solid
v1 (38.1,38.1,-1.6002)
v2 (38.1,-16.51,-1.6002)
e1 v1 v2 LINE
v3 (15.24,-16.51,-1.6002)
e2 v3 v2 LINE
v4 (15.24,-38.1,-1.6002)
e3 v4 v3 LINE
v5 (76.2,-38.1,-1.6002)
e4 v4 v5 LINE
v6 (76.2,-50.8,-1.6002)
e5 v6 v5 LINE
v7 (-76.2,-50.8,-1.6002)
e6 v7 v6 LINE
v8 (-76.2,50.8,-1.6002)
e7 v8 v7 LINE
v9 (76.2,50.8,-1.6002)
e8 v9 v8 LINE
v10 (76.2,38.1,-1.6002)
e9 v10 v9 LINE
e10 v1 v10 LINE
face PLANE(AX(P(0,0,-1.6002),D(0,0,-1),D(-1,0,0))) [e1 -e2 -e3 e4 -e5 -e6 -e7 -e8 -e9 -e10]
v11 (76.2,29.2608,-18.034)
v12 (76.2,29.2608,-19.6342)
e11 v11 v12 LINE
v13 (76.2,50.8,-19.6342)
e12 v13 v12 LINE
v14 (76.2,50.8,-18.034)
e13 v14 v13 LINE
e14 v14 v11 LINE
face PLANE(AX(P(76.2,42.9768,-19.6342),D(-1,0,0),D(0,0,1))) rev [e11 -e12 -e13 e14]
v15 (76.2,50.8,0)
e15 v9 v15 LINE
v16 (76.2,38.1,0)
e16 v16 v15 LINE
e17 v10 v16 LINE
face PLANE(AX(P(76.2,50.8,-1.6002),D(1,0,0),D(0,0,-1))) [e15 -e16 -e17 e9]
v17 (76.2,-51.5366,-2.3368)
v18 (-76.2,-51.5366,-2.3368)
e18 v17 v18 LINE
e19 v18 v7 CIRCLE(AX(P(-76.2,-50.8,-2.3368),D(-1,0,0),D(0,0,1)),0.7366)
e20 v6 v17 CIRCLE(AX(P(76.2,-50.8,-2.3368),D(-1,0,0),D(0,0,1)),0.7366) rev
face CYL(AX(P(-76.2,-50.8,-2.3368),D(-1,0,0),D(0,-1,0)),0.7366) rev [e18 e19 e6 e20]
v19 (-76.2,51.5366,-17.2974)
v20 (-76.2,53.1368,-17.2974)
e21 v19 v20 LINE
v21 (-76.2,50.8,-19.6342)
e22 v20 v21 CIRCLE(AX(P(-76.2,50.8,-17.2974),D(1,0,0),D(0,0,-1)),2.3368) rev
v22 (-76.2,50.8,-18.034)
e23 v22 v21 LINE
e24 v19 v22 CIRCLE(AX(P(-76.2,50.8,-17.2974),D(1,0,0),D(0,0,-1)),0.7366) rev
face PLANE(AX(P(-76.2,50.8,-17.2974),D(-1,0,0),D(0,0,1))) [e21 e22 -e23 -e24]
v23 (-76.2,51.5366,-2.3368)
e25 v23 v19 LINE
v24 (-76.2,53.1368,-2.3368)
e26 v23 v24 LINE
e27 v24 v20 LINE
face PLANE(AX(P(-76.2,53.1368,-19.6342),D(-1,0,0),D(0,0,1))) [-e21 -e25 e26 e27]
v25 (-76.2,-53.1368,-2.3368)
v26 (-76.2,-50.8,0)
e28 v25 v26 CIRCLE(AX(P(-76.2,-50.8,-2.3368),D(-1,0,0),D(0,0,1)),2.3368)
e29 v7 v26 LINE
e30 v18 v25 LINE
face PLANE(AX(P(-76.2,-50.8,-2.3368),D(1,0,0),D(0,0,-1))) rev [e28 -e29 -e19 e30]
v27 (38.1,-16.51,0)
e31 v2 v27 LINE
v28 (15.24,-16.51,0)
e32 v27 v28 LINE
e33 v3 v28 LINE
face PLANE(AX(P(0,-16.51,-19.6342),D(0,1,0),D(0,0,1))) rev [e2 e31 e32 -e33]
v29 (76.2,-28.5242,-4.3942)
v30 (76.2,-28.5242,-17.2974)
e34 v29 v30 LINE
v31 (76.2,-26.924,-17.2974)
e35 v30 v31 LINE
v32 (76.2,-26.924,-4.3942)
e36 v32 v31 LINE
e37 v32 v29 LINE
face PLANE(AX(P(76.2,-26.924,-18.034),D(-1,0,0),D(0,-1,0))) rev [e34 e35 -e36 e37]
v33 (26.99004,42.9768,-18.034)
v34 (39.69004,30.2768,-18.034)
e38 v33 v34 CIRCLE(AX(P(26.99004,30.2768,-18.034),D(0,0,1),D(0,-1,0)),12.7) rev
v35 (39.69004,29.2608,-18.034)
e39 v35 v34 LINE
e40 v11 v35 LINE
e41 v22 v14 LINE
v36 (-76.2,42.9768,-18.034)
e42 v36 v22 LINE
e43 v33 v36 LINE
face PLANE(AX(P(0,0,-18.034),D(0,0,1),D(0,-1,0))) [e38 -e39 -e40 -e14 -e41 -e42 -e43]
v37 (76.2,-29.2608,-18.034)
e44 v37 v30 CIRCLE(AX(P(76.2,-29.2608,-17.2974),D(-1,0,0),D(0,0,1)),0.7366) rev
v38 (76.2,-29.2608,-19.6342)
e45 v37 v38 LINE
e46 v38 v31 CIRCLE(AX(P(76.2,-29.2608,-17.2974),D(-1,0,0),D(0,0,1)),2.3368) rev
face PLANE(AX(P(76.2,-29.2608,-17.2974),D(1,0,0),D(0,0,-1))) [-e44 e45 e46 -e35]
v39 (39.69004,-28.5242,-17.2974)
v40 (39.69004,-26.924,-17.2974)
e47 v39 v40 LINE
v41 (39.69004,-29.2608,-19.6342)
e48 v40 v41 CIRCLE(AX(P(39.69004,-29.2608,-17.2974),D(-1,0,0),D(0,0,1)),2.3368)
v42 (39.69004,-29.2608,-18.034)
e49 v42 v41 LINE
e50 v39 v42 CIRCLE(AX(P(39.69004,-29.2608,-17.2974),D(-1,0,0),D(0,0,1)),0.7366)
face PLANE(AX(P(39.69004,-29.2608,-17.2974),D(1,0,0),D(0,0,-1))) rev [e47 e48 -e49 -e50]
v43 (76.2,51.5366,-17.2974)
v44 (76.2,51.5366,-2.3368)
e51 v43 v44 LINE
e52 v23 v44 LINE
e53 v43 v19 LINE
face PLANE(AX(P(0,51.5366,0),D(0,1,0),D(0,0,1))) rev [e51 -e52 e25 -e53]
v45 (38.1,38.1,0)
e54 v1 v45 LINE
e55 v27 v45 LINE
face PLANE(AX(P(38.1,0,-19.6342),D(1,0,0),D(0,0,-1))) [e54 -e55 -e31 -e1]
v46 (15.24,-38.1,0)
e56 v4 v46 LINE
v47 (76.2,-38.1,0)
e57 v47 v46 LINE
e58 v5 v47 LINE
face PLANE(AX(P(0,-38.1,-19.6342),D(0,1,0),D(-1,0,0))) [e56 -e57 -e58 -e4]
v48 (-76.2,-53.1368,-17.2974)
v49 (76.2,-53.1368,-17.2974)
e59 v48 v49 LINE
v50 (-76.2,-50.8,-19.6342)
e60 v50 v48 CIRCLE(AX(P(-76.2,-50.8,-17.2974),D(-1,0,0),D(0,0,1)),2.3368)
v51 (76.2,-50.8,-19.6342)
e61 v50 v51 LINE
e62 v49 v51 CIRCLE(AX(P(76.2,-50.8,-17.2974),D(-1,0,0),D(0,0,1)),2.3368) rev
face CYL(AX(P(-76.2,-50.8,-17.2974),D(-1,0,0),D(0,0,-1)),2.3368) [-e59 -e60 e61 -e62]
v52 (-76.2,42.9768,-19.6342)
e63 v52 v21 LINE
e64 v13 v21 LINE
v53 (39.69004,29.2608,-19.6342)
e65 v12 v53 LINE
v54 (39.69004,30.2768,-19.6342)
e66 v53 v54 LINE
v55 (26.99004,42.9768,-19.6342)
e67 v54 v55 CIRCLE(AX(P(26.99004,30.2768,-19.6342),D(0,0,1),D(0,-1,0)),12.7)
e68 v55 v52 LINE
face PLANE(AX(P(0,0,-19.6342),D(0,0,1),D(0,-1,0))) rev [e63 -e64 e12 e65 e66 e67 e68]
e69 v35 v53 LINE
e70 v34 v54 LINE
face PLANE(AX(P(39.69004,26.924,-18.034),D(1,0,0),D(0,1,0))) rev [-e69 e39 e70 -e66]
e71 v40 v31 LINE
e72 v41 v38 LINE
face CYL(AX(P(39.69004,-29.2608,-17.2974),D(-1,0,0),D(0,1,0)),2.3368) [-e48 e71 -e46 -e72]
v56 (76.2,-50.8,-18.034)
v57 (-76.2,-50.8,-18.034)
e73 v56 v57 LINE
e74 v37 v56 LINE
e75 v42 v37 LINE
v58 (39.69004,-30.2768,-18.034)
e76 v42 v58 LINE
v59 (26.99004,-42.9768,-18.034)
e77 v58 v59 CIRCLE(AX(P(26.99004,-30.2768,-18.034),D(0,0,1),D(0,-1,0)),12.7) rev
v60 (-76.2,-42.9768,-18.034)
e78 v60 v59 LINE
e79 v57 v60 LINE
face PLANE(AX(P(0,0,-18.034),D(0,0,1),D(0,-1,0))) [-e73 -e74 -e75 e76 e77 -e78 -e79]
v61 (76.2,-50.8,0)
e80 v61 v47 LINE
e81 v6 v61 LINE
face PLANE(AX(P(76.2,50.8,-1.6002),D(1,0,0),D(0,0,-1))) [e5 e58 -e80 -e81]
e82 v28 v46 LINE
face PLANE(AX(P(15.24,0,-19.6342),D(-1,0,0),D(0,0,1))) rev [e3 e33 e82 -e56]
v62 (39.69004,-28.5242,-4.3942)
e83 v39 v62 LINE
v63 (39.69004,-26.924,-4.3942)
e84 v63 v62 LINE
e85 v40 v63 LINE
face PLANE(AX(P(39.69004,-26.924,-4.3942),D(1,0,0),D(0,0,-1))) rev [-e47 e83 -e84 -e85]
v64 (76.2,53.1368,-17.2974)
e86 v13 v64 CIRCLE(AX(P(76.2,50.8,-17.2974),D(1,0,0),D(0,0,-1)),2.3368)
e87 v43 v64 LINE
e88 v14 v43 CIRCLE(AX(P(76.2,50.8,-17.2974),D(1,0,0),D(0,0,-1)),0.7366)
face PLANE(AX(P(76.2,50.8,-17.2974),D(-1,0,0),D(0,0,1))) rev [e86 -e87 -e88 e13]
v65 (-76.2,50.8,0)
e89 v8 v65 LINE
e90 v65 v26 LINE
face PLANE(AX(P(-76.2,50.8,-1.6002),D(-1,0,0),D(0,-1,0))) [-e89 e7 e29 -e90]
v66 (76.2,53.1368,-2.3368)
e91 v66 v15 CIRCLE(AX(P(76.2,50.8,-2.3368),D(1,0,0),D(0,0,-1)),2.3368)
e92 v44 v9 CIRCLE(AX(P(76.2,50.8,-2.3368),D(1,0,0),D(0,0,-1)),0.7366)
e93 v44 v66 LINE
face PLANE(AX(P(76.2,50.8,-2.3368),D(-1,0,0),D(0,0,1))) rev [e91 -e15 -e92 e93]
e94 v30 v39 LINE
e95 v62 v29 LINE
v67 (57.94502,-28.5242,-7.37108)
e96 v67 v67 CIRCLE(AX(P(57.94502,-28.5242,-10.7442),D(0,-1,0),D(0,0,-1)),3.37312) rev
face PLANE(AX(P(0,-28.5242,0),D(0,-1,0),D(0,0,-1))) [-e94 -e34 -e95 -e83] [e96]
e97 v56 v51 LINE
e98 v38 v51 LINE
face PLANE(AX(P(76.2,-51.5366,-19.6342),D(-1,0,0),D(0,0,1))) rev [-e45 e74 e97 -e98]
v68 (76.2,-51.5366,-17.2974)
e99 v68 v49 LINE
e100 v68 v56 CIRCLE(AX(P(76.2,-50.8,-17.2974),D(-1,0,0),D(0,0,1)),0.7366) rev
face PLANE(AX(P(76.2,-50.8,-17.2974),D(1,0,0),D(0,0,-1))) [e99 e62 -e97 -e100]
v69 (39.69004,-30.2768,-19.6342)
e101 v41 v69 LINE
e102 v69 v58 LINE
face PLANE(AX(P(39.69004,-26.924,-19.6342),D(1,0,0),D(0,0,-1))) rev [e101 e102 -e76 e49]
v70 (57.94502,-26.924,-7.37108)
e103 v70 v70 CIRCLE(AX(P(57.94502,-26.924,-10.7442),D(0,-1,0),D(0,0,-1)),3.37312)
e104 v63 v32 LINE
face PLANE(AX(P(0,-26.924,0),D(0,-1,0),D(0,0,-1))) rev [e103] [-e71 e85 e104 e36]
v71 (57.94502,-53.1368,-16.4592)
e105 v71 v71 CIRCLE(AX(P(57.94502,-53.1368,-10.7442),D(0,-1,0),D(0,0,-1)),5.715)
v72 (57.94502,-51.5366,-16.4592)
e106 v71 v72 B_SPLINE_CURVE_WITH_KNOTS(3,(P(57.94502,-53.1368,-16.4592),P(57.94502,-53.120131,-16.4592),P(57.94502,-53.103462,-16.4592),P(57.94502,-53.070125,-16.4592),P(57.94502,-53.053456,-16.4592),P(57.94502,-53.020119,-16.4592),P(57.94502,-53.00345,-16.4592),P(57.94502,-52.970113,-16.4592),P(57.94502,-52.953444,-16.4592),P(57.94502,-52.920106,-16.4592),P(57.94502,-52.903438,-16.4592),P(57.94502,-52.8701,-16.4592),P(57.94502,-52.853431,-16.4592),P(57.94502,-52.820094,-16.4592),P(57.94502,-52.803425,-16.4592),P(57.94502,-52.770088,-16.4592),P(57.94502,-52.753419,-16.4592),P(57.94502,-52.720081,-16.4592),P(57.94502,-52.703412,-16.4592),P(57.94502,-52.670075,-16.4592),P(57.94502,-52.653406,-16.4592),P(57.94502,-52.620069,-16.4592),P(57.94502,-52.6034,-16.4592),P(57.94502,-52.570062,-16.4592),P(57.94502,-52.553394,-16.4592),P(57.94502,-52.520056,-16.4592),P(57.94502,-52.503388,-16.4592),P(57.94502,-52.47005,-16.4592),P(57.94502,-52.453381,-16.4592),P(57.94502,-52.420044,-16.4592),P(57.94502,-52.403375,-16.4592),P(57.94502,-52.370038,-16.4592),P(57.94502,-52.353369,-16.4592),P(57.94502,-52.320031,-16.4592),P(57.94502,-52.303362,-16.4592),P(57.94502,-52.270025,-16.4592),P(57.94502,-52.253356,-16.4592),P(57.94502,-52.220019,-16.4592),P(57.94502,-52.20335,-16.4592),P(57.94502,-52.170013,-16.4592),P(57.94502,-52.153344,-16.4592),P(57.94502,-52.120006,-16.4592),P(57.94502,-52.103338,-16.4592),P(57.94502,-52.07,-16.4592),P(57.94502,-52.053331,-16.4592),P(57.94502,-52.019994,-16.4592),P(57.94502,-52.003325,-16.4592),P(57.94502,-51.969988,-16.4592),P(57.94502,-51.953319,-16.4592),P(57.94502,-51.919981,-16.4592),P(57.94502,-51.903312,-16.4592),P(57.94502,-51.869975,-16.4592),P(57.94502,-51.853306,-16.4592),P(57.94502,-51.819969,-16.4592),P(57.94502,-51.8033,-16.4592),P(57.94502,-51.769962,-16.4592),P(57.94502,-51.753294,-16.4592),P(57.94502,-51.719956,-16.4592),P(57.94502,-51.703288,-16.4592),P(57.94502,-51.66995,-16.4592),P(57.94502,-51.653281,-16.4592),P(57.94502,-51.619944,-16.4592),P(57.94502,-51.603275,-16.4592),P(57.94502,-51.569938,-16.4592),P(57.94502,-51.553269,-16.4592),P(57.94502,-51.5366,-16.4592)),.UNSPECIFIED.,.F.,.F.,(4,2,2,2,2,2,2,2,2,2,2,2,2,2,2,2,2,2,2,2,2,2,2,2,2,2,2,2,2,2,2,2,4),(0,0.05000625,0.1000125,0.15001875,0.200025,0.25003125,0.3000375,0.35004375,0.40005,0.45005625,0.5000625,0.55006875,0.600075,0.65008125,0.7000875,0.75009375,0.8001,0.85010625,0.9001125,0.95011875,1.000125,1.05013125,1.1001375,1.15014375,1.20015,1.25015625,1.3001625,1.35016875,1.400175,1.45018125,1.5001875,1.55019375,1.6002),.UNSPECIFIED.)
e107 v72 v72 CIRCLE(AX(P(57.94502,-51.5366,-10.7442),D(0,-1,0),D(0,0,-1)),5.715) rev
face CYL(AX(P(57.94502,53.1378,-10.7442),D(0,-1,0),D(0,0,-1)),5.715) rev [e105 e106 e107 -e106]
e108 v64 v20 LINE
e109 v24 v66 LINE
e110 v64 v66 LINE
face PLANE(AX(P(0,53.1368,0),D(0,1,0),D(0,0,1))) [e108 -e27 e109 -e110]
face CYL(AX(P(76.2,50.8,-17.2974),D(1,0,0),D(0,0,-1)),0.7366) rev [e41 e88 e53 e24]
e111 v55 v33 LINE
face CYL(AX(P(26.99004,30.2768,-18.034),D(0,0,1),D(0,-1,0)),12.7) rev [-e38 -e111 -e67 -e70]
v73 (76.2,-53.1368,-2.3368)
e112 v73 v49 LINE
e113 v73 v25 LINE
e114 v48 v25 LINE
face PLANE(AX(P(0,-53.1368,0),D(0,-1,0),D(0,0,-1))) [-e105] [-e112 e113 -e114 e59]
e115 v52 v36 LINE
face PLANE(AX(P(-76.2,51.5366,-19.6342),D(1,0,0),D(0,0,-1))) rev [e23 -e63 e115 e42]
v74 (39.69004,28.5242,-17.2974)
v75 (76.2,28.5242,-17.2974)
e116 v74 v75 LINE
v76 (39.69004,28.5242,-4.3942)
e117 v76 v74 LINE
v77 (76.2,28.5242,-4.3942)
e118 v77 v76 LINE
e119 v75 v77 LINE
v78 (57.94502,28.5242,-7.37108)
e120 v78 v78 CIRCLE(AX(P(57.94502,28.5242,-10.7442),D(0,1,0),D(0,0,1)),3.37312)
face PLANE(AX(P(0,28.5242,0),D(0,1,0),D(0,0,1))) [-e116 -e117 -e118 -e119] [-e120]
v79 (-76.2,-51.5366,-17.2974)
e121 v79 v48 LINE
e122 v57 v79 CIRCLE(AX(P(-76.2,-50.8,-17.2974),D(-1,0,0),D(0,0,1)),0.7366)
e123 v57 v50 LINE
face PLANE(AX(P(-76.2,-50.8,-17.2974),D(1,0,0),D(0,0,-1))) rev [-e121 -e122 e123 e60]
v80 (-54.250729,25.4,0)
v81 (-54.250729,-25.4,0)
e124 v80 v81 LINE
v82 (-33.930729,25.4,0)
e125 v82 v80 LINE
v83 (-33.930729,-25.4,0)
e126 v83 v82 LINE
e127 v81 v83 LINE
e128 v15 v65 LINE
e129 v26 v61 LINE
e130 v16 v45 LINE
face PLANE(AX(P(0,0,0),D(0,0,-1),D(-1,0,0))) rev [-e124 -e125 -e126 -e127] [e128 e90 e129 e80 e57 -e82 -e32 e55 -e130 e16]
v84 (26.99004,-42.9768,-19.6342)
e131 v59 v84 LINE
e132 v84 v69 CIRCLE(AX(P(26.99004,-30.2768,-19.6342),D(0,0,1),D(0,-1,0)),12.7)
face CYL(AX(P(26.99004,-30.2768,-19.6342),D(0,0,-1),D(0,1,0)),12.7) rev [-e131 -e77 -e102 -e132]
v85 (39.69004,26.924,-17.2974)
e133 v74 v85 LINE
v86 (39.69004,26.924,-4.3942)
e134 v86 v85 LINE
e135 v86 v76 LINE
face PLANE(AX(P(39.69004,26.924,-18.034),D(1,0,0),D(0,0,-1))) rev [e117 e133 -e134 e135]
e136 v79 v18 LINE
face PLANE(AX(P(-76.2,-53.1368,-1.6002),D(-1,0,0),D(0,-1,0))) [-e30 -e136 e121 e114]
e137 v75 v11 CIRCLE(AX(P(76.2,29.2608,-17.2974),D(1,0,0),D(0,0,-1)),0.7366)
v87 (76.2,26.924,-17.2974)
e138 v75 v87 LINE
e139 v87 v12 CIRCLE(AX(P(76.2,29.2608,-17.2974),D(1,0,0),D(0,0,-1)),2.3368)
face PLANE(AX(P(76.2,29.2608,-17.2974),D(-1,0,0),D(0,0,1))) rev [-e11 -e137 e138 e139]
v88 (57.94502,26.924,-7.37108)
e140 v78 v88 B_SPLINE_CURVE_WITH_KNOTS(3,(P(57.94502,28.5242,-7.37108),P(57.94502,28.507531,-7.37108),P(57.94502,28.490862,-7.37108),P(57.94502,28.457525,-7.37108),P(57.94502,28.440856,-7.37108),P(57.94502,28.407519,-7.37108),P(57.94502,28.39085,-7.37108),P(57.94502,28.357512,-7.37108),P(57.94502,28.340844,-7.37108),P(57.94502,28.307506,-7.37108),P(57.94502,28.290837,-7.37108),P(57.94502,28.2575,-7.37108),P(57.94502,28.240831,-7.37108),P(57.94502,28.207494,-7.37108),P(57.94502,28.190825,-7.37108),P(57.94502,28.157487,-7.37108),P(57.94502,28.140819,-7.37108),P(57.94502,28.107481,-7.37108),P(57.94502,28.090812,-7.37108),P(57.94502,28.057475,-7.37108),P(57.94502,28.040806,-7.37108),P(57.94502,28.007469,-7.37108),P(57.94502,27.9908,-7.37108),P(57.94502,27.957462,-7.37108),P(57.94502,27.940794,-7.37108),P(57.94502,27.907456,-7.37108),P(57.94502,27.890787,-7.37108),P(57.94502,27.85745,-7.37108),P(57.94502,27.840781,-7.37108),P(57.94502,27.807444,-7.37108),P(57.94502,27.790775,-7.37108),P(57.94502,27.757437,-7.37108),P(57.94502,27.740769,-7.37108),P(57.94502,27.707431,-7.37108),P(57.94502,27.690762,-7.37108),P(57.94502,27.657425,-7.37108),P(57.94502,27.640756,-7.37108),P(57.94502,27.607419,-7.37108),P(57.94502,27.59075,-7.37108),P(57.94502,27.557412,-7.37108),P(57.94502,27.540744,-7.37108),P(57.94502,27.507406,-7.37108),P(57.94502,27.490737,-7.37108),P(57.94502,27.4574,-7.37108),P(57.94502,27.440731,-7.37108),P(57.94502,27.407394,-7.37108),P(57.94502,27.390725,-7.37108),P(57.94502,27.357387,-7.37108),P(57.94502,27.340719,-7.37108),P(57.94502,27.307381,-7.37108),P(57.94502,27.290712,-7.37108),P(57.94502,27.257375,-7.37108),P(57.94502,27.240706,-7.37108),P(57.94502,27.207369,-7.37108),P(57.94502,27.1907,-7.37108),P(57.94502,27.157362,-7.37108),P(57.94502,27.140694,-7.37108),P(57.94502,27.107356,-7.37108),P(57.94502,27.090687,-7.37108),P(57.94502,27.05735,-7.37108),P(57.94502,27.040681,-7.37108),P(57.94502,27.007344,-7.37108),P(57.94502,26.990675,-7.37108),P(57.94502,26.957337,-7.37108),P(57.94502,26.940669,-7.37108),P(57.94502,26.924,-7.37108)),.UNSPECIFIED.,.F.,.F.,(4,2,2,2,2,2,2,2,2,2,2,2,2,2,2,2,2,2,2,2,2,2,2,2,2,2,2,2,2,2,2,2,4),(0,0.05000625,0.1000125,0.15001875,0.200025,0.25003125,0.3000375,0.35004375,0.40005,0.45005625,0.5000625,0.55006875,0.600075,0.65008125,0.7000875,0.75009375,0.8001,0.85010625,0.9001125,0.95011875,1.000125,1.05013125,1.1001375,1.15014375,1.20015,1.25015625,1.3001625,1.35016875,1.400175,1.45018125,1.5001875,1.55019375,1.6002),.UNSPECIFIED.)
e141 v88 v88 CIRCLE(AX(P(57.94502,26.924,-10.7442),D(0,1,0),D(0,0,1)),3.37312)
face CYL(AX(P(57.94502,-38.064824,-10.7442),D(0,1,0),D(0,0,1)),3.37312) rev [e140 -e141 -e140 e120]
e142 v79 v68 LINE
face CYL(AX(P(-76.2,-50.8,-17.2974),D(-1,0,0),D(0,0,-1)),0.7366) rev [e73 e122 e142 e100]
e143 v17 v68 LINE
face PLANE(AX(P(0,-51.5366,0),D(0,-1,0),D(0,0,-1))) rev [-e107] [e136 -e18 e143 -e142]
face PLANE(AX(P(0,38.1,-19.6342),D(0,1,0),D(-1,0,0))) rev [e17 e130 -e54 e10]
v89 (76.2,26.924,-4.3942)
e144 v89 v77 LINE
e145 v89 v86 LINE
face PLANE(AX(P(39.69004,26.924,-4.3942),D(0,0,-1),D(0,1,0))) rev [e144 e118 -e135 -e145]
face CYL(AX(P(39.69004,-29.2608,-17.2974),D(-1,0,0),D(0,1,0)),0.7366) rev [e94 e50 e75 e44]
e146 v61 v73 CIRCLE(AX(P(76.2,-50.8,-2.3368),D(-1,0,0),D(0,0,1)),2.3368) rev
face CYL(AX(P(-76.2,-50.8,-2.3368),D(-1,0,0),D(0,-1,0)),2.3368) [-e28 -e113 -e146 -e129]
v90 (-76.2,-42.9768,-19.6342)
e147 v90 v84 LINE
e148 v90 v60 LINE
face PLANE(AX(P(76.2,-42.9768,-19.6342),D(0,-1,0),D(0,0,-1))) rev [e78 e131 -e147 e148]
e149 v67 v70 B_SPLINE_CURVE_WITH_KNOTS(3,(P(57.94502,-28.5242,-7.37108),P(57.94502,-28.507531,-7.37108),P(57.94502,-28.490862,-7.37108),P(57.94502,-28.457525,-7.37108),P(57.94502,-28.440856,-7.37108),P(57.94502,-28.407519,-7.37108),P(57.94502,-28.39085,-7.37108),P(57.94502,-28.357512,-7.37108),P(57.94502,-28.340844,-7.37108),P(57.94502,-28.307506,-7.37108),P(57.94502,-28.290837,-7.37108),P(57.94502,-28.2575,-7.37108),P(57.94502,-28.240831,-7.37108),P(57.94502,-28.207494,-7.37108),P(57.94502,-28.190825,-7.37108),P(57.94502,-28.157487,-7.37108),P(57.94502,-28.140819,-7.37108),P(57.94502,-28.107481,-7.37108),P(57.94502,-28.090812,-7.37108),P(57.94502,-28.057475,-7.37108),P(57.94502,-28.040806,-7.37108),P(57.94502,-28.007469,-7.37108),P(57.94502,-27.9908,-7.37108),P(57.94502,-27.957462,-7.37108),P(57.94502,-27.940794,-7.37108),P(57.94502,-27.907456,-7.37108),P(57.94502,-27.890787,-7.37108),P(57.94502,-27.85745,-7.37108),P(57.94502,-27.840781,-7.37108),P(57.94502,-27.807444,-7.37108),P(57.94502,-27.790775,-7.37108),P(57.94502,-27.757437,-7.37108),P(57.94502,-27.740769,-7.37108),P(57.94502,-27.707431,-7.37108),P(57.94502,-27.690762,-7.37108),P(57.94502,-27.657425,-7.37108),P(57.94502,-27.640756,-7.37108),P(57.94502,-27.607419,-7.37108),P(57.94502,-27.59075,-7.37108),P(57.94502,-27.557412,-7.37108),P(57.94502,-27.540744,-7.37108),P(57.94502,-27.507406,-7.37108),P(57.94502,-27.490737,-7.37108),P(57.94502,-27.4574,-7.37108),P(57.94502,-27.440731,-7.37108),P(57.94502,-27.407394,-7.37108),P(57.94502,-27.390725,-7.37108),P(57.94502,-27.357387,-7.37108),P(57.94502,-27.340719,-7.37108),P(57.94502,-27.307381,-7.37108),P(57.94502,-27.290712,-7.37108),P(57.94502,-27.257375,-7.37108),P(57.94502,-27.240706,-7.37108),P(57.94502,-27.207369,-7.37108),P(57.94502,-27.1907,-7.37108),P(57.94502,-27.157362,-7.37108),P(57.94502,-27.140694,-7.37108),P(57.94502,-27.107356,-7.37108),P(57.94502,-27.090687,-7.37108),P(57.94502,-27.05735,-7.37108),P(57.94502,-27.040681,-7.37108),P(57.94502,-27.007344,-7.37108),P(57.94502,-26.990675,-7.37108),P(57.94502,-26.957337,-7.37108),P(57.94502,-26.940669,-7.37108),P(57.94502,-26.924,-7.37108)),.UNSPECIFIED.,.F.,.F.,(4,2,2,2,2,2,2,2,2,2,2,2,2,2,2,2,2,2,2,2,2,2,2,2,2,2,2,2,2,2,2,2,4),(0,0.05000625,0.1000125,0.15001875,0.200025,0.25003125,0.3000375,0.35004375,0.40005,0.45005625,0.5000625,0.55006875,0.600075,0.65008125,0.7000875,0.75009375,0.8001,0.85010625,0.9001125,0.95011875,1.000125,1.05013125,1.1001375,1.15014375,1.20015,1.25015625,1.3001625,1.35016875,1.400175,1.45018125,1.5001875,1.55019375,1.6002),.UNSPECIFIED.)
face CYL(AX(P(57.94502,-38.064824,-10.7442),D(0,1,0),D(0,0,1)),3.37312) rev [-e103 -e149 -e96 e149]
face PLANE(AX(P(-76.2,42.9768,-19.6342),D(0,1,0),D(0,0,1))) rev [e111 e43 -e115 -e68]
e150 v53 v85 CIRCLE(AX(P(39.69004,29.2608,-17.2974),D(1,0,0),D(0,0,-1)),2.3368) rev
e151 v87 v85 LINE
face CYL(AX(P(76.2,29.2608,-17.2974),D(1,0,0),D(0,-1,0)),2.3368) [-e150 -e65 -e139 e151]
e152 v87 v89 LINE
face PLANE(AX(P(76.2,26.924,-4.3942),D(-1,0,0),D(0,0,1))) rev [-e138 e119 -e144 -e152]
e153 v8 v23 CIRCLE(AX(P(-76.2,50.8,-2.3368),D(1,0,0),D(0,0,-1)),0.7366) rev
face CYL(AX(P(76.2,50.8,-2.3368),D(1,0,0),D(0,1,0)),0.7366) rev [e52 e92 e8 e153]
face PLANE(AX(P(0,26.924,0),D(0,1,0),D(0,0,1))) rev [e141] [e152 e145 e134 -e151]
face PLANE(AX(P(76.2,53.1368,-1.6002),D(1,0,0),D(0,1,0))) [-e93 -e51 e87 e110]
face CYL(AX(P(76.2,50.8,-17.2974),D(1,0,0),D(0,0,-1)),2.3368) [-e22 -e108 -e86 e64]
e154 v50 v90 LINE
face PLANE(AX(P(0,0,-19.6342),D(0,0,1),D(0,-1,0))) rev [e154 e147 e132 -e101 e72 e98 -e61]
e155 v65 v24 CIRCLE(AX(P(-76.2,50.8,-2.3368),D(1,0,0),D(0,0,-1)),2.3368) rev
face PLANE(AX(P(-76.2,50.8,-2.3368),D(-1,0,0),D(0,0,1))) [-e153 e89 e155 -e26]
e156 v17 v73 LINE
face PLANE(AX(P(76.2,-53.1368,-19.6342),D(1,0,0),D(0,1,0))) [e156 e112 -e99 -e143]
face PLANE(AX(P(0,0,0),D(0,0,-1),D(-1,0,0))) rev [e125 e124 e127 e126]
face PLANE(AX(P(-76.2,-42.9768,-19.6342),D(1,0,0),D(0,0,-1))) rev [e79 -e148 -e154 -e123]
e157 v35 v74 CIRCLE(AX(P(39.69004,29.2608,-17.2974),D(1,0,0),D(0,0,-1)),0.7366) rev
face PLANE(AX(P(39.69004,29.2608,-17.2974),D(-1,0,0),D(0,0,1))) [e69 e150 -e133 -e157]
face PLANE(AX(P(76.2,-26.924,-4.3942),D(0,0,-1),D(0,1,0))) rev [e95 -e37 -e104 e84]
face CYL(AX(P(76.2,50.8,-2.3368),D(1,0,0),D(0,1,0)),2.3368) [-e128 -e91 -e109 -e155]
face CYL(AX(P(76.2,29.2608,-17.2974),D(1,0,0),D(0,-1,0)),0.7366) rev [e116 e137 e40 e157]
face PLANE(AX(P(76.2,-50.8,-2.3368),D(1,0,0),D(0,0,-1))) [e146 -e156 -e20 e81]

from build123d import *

# Parameters (mm, degrees)
SKETCH1_W                      = 152.4
SKETCH1_H                      = 101.6
BASE_FLANGE1_DEPTH             = 1.6002
EDGE_FLANGE1_DEPTH             = 152.4
EDGE_FLANGE2_DEPTH             = 152.4
CUT_EXTRUDE1_DEPTH             = 95.949783169
EDGE_FLANGE7_STRIP_W           = 7.874
EDGE_FLANGE7_STRIP_H           = 1.6002
EDGE_FLANGE7_STRIP_CUT_DEPTH   = 152.4
EDGE_FLANGE7_DEPTH             = 152.4
EDGE_FLANGE8_STRIP_W           = 7.874
EDGE_FLANGE8_STRIP_H           = 1.6002
EDGE_FLANGE8_STRIP_CUT_DEPTH   = 152.4
EDGE_FLANGE8_DEPTH             = 152.4
SKETCH35_W                     = 36.50996
SKETCH35_H                     = 1.6002
BOSS_EXTRUDE1_DEPTH            = 16.0528
EDGE_FLANGE9_STRIP_W           = 7.874
EDGE_FLANGE9_STRIP_H           = 1.6002
EDGE_FLANGE9_STRIP_CUT_DEPTH   = 36.50996
EDGE_FLANGE9_DEPTH             = 36.50996
SKETCH39_W                     = 36.50996
SKETCH39_H                     = 1.6002
BOSS_EXTRUDE2_DEPTH            = 16.0528
EDGE_FLANGE10_STRIP_W          = 7.874
EDGE_FLANGE10_STRIP_H          = 1.6002
EDGE_FLANGE10_STRIP_CUT_DEPTH  = 36.50996
EDGE_FLANGE10_DEPTH            = 36.50996
CUT_EXTRUDE2_REACH             = 114.257
SKETCH43_R                     = 3.37312
CUT_EXTRUDE2_DIRECTION_2_REACH = 114.257
FILLET1_R                      = 12.7
CUT_EXTRUDE3_REACH             = 134.235
SKETCH46_R                     = 5.715


# Sheet-metal steps are written as plain solids
with BuildPart() as part:
    # Sketch1 → Base-Flange1 (new body)
    with BuildSketch(Plane.XY):
        Rectangle(SKETCH1_W, SKETCH1_H)
    extrude(amount=-BASE_FLANGE1_DEPTH)

    # Edge-Flange1 section (across the edge) → Edge-Flange1 (add)
    with BuildSketch(Plane(origin=(-76.2, 51.5366, -1.6002), x_dir=(0, -1, 0), z_dir=(1, 0, 0))):
        with BuildLine():
            Line((-1.6002, 0.7366), (-1.6002, 18.034))
            Line((-1.6002, 18.034), (0, 18.034))
            Line((0, 18.034), (0, 0.7366))
            ThreePointArc((0, 0.7366), (0.215745145, 0.215745145), (0.7366, 0))
            Line((0.7366, 0), (0.7366, -1.6002))
            ThreePointArc((0.7366, -1.6002), (-0.915767126, -0.915767126), (-1.6002, 0.7366))
        make_face()
    extrude(amount=EDGE_FLANGE1_DEPTH)

    # Edge-Flange2 section (across the edge) → Edge-Flange2 (add)
    with BuildSketch(Plane(origin=(76.2, -51.5366, -1.6002), x_dir=(0, 1, 0), z_dir=(-1, 0, 0))):
        with BuildLine():
            Line((-1.6002, 0.7366), (-1.6002, 18.034))
            Line((-1.6002, 18.034), (0, 18.034))
            Line((0, 18.034), (0, 0.7366))
            ThreePointArc((0, 0.7366), (0.215745145, 0.215745145), (0.7366, 0))
            Line((0.7366, 0), (0.7366, -1.6002))
            ThreePointArc((0.7366, -1.6002), (-0.915767126, -0.915767126), (-1.6002, 0.7366))
        make_face()
    extrude(amount=EDGE_FLANGE2_DEPTH)

    # Sketch14 → Cut-Extrude1 (cut, through all)
    with BuildSketch(Plane.XY):
        Polygon((76.2, -38.1), (76.2, 38.1), (38.1, 38.1), (38.1, -16.51), (15.24, -16.51), (15.24, -38.1), align=None)
    extrude(amount=-CUT_EXTRUDE1_DEPTH, mode=Mode.SUBTRACT)

    # Edge-Flange7 strip (across the edge) → Edge-Flange7 strip cut (cut)
    with BuildSketch(Plane(origin=(76.2, -51.5366, -19.6342), x_dir=(0, 0, 1), z_dir=(-1, 0, 0))):
        with Locations((-1.6002, -0.8001)):
            Rectangle(EDGE_FLANGE7_STRIP_W, EDGE_FLANGE7_STRIP_H)
    extrude(amount=EDGE_FLANGE7_STRIP_CUT_DEPTH, mode=Mode.SUBTRACT)

    # Edge-Flange7 section (across the edge) → Edge-Flange7 (add)
    with BuildSketch(Plane(origin=(76.2, -51.5366, -19.6342), x_dir=(0, 0, 1), z_dir=(-1, 0, 0))):
        with BuildLine():
            Line((0, 0.7366), (0, 8.5598))
            Line((0, 8.5598), (1.6002, 8.5598))
            Line((1.6002, 8.5598), (1.6002, 0.7366))
            ThreePointArc((1.6002, 0.7366), (1.815945145, 0.215745145), (2.3368, 0))
            Line((2.3368, 0), (2.3368, -1.6002))
            ThreePointArc((2.3368, -1.6002), (0.684432874, -0.915767126), (0, 0.7366))
        make_face()
    extrude(amount=EDGE_FLANGE7_DEPTH)

    # Edge-Flange8 strip (across the edge) → Edge-Flange8 strip cut (cut)
    with BuildSketch(Plane(origin=(-76.2, 51.5366, -19.6342), x_dir=(0, 0, 1), z_dir=(1, 0, 0))):
        with Locations((-1.6002, -0.8001)):
            Rectangle(EDGE_FLANGE8_STRIP_W, EDGE_FLANGE8_STRIP_H)
    extrude(amount=EDGE_FLANGE8_STRIP_CUT_DEPTH, mode=Mode.SUBTRACT)

    # Edge-Flange8 section (across the edge) → Edge-Flange8 (add)
    with BuildSketch(Plane(origin=(-76.2, 51.5366, -19.6342), x_dir=(0, 0, 1), z_dir=(1, 0, 0))):
        with BuildLine():
            Line((0, 0.7366), (0, 8.5598))
            Line((0, 8.5598), (1.6002, 8.5598))
            Line((1.6002, 8.5598), (1.6002, 0.7366))
            ThreePointArc((1.6002, 0.7366), (1.815945145, 0.215745145), (2.3368, 0))
            Line((2.3368, 0), (2.3368, -1.6002))
            ThreePointArc((2.3368, -1.6002), (0.684432874, -0.915767126), (0, 0.7366))
        make_face()
    extrude(amount=EDGE_FLANGE8_DEPTH)

    # Sketch35 → Boss-Extrude1 (add)
    with BuildSketch(Plane(origin=(0, -42.9768, 0), x_dir=(1, 0, 0), z_dir=(0, 1, 0))):
        with Locations((57.94502, 18.8341)):
            Rectangle(SKETCH35_W, SKETCH35_H)
    extrude(amount=BOSS_EXTRUDE1_DEPTH)

    # Edge-Flange9 strip (across the edge) → Edge-Flange9 strip cut (cut)
    with BuildSketch(Plane(origin=(76.2, -26.924, -18.034), x_dir=(0, -1, 0), z_dir=(-1, 0, 0))):
        with Locations((-1.6002, -0.8001)):
            Rectangle(EDGE_FLANGE9_STRIP_W, EDGE_FLANGE9_STRIP_H)
    extrude(amount=EDGE_FLANGE9_STRIP_CUT_DEPTH, mode=Mode.SUBTRACT)

    # Edge-Flange9 section (across the edge) → Edge-Flange9 (add)
    with BuildSketch(Plane(origin=(76.2, -26.924, -18.034), x_dir=(0, -1, 0), z_dir=(-1, 0, 0))):
        with BuildLine():
            Line((0, 0.7366), (0, 13.6398))
            Line((0, 13.6398), (1.6002, 13.6398))
            Line((1.6002, 13.6398), (1.6002, 0.7366))
            ThreePointArc((1.6002, 0.7366), (1.815945145, 0.215745145), (2.3368, 0))
            Line((2.3368, 0), (2.3368, -1.6002))
            ThreePointArc((2.3368, -1.6002), (0.684432874, -0.915767126), (0, 0.7366))
        make_face()
    extrude(amount=EDGE_FLANGE9_DEPTH)

    # Sketch39 → Boss-Extrude2 (add)
    with BuildSketch(Plane.XZ.offset(-42.9768)):
        with Locations((57.94502, -18.8341)):
            Rectangle(SKETCH39_W, SKETCH39_H)
    extrude(amount=BOSS_EXTRUDE2_DEPTH)

    # Edge-Flange10 strip (across the edge) → Edge-Flange10 strip cut (cut)
    with BuildSketch(Plane(origin=(39.69004, 26.924, -18.034), x_dir=(0, 1, 0), z_dir=(1, 0, 0))):
        with Locations((-1.6002, -0.8001)):
            Rectangle(EDGE_FLANGE10_STRIP_W, EDGE_FLANGE10_STRIP_H)
    extrude(amount=EDGE_FLANGE10_STRIP_CUT_DEPTH, mode=Mode.SUBTRACT)

    # Edge-Flange10 section (across the edge) → Edge-Flange10 (add)
    with BuildSketch(Plane(origin=(39.69004, 26.924, -18.034), x_dir=(0, 1, 0), z_dir=(1, 0, 0))):
        with BuildLine():
            Line((0, 0.7366), (0, 13.6398))
            Line((0, 13.6398), (1.6002, 13.6398))
            Line((1.6002, 13.6398), (1.6002, 0.7366))
            ThreePointArc((1.6002, 0.7366), (1.815945145, 0.215745145), (2.3368, 0))
            Line((2.3368, 0), (2.3368, -1.6002))
            ThreePointArc((2.3368, -1.6002), (0.684432874, -0.915767126), (0, 0.7366))
        make_face()
    extrude(amount=EDGE_FLANGE10_DEPTH)

    # Cut-Extrude2: up to this face of the body (flat: up to its plane)
    cut_extrude2_end = Plane(part.part.faces().sort_by_distance((57.94502, -28.5242, -10.8458))[0])
    # Sketch43 → Cut-Extrude2 (cut, up to the picked face)
    with BuildSketch(Plane(origin=(0, -26.924, 0), x_dir=(1, 0, 0), z_dir=(0, 1, 0)), mode=Mode.PRIVATE) as cut_extrude2_sk1:
        with Locations(Location((57.94502, 10.7442, 0), (0, 0, 270))):
            Circle(SKETCH43_R)
    cut_extrude2_tool1 = split(extrude(cut_extrude2_sk1.sketch, amount=-CUT_EXTRUDE2_REACH, mode=Mode.PRIVATE), bisect_by=cut_extrude2_end, keep=Keep.BOTH, mode=Mode.PRIVATE)
    add(cut_extrude2_tool1.solids().sort_by(Axis((57.94502, -26.924, -10.7442), (0, -1, 0)))[0], mode=Mode.SUBTRACT)

    # Cut-Extrude2 direction 2: up to this face of the body (flat: up to its plane)
    cut_extrude2_direction_2_end = Plane(part.part.faces().sort_by_distance((57.94502, 28.5242, -10.8458))[0])
    # Sketch43 → Cut-Extrude2 direction 2 (cut, up to the picked face)
    with BuildSketch(Plane(origin=(0, -26.924, 0), x_dir=(1, 0, 0), z_dir=(0, 1, 0)), mode=Mode.PRIVATE) as cut_extrude2_direction_2_sk1:
        with Locations(Location((57.94502, 10.7442, 0), (0, 0, 270))):
            Circle(SKETCH43_R)
    cut_extrude2_direction_2_tool1 = split(extrude(cut_extrude2_direction_2_sk1.sketch, amount=CUT_EXTRUDE2_DIRECTION_2_REACH, mode=Mode.PRIVATE), bisect_by=cut_extrude2_direction_2_end, keep=Keep.BOTH, mode=Mode.PRIVATE)
    add(cut_extrude2_direction_2_tool1.solids().sort_by(Axis((57.94502, -26.924, -10.7442), (0, 1, 0)))[0], mode=Mode.SUBTRACT)

    # Fillet1
    fillet1_edges = [part.edges().sort_by_distance(p)[0] for p in [
        (39.69004, -42.9768, -18.8341),
        (39.69004, 42.9768, -18.8341),
    ]]
    fillet(fillet1_edges, radius=FILLET1_R)

    # Sketch46 → Cut-Extrude3 (cut, up to next)
    with BuildSketch(Plane.XZ.offset(53.1368), mode=Mode.PRIVATE) as cut_extrude3_sk1:
        with Locations(Location((57.94502, -10.7442, 0), (0, 0, 270))):
            Circle(SKETCH46_R)
    cut_extrude3_tool1 = extrude(cut_extrude3_sk1.sketch, amount=-CUT_EXTRUDE3_REACH, mode=Mode.PRIVATE) & part.part
    add(cut_extrude3_tool1.solids().sort_by_distance((57.94502, -53.1368, -10.7442))[0], mode=Mode.SUBTRACT)


solid = part.part
